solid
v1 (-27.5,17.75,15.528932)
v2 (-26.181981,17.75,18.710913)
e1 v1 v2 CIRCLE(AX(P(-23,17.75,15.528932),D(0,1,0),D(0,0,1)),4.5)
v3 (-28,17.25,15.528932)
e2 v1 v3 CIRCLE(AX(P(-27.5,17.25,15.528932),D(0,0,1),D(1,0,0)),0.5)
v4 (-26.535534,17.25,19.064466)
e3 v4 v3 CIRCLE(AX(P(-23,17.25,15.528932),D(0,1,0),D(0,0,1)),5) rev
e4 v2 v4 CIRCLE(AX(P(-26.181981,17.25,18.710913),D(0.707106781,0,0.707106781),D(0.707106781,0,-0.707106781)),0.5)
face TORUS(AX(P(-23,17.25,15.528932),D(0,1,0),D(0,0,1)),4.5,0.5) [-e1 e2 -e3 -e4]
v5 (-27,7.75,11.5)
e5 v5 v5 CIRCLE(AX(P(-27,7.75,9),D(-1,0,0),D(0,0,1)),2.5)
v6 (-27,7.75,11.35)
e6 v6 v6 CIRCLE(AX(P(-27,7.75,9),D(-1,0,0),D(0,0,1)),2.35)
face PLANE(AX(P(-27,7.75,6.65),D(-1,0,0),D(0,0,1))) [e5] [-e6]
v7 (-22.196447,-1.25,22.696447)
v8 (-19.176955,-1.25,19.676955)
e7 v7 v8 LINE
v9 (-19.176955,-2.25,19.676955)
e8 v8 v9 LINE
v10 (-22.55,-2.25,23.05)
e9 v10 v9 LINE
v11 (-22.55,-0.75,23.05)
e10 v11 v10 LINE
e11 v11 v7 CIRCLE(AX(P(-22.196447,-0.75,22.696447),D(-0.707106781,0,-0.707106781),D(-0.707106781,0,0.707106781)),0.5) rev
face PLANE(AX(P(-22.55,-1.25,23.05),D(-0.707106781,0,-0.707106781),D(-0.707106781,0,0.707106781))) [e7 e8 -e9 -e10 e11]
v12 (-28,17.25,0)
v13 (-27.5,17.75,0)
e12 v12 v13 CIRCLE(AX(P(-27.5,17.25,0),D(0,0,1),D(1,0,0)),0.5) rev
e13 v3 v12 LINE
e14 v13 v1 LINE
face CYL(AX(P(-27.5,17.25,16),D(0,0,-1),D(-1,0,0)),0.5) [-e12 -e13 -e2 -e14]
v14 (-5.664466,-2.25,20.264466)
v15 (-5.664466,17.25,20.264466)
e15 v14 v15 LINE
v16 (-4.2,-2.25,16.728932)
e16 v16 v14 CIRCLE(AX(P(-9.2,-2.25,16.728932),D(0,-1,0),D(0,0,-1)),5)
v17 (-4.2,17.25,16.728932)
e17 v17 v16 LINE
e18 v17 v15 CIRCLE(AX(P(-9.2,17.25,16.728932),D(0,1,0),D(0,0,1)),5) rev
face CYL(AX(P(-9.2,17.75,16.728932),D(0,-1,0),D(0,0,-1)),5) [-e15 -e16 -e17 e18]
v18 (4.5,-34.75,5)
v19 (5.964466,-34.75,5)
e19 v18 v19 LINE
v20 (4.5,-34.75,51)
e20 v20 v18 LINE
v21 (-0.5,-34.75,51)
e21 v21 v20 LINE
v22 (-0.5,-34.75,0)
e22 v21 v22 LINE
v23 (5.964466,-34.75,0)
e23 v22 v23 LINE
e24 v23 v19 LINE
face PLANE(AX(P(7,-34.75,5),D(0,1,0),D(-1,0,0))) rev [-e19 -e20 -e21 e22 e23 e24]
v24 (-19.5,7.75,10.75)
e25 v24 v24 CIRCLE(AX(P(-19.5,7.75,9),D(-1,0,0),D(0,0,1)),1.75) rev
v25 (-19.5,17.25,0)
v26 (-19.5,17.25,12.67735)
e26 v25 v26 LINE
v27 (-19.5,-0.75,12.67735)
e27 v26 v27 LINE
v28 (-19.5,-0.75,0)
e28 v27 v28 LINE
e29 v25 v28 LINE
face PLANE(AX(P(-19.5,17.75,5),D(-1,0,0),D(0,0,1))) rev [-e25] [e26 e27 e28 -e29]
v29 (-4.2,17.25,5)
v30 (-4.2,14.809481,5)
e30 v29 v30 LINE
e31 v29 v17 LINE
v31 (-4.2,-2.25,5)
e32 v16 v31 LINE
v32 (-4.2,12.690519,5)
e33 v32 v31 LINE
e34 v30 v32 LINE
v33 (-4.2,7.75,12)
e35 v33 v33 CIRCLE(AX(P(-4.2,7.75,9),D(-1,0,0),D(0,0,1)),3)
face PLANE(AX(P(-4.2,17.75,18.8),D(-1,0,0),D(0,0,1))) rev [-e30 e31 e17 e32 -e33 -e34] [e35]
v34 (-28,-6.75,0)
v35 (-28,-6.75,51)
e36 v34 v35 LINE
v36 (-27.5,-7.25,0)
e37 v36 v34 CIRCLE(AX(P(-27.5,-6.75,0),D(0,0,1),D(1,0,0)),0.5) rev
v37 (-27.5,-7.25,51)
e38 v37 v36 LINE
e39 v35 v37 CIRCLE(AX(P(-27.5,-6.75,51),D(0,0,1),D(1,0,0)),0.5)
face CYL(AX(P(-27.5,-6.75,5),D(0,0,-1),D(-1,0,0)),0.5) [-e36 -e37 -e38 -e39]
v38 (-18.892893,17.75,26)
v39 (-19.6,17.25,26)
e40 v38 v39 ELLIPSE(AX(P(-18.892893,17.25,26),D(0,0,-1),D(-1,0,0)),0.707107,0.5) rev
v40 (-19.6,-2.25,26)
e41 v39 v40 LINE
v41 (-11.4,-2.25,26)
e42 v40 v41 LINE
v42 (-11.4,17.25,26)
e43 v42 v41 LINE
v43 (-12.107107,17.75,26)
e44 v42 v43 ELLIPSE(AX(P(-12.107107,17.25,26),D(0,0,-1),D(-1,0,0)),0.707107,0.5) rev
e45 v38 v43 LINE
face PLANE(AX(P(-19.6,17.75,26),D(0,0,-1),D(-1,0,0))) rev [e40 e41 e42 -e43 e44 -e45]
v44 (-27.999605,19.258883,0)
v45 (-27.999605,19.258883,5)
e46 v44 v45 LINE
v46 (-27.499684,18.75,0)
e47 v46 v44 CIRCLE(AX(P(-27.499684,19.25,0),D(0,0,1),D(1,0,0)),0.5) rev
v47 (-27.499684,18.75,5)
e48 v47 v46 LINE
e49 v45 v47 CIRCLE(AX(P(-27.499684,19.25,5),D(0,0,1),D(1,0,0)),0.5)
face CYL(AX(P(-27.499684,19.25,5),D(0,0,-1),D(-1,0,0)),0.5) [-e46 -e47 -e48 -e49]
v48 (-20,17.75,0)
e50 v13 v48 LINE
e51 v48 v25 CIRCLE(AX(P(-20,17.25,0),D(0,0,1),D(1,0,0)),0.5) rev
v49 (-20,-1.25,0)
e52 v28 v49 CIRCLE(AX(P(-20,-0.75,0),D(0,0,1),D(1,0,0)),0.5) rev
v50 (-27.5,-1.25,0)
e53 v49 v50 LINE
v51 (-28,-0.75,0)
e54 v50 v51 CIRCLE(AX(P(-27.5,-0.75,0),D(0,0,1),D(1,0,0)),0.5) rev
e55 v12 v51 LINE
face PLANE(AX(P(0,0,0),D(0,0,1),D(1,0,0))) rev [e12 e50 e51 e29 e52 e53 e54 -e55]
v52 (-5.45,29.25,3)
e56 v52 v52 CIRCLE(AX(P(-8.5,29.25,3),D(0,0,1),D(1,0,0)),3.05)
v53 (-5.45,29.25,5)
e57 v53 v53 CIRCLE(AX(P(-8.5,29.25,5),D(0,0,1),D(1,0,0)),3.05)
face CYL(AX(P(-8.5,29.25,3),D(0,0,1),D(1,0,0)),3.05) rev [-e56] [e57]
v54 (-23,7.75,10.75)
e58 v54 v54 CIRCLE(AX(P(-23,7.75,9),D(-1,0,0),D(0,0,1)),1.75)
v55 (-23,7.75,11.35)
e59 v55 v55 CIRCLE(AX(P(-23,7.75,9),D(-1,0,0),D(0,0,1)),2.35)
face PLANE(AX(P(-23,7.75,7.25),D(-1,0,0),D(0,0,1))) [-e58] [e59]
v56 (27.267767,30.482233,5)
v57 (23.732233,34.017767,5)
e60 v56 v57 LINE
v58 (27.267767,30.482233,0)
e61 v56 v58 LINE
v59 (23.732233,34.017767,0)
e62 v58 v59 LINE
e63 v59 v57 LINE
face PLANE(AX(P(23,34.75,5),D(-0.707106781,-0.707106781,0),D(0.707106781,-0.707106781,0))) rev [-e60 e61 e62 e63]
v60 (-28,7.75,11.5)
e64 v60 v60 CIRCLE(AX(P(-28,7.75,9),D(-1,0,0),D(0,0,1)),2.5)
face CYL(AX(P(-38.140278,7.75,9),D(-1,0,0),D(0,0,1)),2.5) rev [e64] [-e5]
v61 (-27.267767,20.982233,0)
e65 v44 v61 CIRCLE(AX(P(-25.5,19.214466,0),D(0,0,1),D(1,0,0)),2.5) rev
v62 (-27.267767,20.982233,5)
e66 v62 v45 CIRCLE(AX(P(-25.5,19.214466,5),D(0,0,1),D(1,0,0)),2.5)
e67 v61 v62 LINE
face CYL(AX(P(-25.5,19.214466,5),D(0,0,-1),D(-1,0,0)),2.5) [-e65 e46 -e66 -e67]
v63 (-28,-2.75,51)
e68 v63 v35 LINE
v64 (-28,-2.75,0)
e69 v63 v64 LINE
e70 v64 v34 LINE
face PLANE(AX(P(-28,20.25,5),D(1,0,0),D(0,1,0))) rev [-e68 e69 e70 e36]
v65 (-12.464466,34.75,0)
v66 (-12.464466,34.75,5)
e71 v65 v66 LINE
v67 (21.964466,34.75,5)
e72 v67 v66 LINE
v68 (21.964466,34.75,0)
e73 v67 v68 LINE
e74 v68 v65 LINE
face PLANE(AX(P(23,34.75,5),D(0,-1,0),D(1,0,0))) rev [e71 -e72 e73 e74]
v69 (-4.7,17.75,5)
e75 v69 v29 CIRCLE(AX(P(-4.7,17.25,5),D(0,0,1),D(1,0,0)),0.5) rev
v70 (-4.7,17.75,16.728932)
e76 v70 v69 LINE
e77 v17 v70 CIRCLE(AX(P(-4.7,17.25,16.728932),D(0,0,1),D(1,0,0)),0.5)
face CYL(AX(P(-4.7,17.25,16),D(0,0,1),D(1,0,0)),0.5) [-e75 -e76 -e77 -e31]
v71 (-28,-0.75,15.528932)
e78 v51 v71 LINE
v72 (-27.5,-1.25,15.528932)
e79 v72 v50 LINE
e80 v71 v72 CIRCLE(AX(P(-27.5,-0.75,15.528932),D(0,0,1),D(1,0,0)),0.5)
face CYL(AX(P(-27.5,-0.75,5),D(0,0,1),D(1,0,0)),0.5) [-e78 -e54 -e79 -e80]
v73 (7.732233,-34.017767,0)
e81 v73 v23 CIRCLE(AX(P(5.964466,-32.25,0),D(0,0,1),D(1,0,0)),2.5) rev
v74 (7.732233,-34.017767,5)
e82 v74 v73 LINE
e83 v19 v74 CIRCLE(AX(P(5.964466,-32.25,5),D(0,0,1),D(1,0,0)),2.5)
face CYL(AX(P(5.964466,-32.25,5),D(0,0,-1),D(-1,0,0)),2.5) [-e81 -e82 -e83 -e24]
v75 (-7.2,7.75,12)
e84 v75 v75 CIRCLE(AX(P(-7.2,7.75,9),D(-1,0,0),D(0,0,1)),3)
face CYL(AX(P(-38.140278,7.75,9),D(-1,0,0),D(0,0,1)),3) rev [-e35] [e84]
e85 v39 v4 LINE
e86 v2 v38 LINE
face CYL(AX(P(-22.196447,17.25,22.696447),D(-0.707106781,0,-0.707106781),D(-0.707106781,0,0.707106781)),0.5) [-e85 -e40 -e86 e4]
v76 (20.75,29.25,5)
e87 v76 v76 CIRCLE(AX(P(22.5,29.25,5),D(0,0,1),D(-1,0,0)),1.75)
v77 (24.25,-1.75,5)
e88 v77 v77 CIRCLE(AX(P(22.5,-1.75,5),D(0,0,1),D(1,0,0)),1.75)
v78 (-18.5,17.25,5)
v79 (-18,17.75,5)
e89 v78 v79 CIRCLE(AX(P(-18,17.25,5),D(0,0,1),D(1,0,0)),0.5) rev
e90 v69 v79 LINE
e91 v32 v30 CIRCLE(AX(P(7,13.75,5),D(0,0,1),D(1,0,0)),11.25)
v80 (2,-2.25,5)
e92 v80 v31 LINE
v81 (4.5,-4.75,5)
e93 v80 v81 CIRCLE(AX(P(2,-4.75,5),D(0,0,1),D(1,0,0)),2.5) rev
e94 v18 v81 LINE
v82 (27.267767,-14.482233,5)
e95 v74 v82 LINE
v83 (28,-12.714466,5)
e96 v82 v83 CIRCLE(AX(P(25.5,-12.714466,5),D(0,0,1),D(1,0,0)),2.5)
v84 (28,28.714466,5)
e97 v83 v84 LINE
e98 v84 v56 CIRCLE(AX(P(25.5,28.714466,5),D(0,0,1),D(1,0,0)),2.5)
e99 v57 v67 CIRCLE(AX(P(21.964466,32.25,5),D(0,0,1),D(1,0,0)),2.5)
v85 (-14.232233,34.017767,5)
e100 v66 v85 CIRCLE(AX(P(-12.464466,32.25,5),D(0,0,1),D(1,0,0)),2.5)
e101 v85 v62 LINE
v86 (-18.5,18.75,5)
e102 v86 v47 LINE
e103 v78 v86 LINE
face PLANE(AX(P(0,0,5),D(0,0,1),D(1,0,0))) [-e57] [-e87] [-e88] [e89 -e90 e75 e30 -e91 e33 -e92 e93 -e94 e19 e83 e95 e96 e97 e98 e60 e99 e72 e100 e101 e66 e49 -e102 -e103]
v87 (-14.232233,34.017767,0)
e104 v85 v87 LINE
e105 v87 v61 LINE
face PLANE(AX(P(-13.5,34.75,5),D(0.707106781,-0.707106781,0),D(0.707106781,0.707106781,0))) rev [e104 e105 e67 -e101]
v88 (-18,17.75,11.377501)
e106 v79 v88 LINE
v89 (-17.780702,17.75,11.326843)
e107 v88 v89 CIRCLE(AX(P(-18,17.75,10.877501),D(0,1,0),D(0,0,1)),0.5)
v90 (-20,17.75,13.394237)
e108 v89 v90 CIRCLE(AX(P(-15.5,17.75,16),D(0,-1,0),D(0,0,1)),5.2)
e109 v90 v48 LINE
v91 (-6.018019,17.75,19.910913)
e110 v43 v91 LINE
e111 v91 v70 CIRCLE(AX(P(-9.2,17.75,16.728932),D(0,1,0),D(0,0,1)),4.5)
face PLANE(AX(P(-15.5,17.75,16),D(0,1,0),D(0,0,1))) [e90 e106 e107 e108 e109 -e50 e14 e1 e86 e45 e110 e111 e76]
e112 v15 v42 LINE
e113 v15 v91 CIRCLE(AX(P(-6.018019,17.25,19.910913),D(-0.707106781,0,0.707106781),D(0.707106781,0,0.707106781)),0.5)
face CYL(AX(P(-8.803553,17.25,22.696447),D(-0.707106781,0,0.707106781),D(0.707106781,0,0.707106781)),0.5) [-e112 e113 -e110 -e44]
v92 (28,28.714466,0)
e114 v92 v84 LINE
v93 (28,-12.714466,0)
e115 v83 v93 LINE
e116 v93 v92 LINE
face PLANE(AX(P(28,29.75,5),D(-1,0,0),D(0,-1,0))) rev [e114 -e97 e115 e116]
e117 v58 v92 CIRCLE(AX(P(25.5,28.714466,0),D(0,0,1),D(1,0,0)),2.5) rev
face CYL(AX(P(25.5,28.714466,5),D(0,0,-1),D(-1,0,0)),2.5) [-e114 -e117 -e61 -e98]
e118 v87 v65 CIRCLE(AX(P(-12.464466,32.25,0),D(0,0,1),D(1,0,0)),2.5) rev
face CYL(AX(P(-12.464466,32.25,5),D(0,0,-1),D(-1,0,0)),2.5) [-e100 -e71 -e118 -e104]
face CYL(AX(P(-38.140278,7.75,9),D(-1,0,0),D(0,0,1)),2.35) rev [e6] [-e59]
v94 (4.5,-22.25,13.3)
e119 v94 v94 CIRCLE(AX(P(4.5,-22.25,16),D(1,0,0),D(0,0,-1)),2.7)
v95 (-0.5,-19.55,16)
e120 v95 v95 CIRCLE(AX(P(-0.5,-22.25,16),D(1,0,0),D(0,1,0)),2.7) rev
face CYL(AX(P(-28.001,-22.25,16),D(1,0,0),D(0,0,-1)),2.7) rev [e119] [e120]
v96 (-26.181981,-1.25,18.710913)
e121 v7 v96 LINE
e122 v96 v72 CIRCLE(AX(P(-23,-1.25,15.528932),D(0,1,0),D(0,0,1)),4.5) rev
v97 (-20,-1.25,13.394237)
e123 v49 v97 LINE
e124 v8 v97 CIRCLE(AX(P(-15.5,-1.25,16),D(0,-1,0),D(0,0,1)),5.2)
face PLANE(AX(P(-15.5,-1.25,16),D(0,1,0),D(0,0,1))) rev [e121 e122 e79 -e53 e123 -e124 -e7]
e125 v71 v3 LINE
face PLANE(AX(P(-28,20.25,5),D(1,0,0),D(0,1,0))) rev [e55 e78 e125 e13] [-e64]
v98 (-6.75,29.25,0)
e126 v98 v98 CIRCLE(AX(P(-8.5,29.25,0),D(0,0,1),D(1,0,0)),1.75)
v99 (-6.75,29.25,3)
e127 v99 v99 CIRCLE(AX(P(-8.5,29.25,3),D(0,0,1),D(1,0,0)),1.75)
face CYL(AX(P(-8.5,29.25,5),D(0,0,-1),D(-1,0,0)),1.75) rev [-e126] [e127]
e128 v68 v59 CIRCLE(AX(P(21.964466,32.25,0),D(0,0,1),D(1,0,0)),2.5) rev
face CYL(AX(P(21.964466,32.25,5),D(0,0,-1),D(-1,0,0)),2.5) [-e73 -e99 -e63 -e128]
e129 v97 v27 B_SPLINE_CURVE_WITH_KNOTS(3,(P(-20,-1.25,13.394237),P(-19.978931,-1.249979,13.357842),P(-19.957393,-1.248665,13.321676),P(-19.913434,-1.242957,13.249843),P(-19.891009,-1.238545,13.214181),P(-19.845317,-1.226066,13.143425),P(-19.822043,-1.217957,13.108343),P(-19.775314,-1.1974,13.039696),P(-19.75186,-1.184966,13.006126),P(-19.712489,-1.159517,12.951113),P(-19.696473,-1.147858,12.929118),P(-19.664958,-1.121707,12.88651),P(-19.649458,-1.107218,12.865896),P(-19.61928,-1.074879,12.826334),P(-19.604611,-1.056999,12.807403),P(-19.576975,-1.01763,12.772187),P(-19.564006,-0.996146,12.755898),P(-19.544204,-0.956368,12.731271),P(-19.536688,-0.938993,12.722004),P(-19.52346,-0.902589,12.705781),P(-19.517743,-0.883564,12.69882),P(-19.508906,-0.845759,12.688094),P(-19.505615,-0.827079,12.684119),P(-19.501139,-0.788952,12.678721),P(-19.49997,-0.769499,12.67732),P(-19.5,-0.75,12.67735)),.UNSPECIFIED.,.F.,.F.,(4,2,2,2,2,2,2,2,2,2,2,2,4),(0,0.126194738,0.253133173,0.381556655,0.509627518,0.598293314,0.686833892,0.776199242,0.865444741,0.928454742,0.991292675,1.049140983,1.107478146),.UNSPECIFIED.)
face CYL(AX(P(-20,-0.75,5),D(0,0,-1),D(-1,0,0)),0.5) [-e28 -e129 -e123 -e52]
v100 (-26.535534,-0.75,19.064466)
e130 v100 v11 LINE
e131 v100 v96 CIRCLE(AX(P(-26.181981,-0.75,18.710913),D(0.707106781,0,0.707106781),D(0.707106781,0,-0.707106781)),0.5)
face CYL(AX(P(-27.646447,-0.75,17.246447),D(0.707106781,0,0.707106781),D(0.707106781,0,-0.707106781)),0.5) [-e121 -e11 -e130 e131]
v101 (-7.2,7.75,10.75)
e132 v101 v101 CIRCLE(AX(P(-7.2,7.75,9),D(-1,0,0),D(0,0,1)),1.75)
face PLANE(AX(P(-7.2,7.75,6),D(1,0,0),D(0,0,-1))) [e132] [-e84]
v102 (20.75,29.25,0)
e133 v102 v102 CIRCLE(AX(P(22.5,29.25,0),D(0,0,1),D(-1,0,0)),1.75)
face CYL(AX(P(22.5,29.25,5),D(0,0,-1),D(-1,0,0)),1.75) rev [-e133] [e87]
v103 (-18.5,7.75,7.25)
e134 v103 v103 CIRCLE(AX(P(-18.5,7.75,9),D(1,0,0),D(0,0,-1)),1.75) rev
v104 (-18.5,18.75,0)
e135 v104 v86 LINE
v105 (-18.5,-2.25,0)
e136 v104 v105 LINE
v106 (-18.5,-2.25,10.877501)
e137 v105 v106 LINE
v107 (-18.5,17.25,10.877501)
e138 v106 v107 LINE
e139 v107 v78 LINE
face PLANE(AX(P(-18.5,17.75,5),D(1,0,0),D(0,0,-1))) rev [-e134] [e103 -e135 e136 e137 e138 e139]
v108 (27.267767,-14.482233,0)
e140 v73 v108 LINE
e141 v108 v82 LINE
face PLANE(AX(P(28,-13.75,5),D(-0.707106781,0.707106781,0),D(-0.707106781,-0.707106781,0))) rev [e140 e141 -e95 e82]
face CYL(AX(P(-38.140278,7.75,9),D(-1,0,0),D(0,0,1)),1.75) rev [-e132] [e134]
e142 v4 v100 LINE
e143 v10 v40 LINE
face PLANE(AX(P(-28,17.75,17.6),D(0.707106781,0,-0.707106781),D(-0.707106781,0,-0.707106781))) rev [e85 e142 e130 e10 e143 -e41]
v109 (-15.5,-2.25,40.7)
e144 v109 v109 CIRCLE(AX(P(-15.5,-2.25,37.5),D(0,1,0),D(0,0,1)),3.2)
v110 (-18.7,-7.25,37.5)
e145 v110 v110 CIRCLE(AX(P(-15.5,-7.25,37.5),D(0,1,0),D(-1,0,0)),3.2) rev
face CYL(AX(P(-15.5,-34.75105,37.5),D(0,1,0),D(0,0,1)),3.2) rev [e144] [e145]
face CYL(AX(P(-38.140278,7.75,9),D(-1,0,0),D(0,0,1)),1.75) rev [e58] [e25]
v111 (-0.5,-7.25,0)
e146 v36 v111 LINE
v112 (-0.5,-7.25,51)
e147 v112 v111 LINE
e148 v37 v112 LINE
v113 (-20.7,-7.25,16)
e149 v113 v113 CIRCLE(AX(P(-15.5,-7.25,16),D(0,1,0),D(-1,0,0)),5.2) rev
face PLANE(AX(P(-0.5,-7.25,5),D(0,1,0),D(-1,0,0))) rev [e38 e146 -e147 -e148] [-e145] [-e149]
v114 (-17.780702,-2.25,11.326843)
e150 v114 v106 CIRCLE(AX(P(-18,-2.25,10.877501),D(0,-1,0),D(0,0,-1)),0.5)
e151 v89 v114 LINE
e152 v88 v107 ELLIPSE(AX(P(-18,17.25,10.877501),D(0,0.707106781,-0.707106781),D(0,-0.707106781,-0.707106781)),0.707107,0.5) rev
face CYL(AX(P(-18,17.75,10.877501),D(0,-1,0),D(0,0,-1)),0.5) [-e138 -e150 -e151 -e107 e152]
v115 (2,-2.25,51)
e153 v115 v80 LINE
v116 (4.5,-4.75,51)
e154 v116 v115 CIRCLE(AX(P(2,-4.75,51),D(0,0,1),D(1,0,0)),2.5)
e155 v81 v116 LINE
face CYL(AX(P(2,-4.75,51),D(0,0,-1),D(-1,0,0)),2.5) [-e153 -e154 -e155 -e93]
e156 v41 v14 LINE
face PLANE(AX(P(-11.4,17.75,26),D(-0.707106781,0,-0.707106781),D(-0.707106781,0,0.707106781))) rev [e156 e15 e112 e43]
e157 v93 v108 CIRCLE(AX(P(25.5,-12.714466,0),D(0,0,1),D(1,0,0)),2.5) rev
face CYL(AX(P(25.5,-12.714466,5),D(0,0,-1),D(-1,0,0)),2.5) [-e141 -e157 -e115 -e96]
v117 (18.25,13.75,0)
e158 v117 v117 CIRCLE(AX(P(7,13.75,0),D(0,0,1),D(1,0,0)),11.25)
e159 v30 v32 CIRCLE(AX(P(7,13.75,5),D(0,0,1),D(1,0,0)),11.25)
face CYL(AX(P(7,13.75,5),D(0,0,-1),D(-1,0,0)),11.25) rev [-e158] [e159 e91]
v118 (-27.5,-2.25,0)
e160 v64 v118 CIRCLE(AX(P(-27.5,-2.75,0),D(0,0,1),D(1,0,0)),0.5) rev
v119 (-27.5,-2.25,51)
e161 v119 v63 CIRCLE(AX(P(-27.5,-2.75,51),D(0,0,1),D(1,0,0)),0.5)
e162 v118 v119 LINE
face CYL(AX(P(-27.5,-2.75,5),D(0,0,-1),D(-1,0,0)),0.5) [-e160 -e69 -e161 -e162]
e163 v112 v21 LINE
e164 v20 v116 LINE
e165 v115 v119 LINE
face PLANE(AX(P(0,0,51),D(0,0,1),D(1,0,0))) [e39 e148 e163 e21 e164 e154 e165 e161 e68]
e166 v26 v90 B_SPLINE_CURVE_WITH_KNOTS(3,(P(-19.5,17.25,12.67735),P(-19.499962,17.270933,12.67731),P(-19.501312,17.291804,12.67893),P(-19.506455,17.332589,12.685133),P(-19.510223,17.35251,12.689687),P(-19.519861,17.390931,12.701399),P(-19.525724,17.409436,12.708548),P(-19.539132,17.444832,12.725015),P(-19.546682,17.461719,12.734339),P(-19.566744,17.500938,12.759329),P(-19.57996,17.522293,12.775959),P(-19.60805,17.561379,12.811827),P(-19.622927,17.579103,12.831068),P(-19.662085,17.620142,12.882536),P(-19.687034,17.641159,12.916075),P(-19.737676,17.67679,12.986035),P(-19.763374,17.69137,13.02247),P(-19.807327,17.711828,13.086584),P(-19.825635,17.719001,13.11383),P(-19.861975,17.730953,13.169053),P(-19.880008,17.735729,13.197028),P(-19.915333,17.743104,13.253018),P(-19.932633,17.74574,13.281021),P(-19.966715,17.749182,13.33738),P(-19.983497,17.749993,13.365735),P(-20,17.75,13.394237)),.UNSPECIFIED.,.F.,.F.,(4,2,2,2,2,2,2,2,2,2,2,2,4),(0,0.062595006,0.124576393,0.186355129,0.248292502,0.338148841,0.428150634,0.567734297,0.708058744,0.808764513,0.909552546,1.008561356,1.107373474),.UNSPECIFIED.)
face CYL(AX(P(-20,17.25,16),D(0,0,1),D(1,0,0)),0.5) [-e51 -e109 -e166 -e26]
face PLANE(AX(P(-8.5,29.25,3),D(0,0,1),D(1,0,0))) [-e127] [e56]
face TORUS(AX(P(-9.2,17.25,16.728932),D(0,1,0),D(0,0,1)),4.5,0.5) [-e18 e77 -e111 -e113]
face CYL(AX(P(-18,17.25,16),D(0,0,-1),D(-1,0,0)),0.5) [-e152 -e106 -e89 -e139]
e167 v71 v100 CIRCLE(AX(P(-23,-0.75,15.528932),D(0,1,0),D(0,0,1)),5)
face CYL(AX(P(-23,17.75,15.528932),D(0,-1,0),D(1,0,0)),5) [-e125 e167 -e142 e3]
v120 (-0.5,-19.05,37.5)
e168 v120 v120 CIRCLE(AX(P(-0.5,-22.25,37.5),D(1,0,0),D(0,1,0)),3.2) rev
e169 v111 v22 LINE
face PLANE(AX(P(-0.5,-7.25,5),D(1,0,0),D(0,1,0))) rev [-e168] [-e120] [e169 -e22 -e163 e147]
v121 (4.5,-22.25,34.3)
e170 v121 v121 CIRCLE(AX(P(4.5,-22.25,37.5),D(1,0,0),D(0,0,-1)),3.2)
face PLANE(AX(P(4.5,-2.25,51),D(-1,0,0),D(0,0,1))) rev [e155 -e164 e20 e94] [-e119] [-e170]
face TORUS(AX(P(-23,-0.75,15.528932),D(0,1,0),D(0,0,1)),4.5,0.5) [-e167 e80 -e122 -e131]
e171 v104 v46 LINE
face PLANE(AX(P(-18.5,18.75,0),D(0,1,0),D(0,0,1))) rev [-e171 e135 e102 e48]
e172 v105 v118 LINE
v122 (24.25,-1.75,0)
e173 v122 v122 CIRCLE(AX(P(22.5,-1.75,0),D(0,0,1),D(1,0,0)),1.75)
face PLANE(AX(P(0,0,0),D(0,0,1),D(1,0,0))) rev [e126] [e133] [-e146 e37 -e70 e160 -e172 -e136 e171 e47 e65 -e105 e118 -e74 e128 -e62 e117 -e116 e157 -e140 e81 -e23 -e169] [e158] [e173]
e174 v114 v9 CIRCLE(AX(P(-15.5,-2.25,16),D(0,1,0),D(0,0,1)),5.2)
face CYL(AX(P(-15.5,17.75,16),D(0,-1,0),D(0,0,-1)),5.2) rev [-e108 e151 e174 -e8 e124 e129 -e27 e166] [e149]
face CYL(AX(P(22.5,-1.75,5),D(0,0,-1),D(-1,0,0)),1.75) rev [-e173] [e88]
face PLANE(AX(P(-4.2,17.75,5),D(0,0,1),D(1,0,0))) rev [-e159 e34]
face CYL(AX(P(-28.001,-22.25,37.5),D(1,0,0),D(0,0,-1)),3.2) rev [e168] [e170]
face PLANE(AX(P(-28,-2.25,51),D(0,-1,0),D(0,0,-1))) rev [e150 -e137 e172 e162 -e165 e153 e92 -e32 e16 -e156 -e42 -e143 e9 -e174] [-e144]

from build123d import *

# Parameters (mm, degrees)
SKETCH1_R           = 11.25
SKETCH1_R_2         = 1.75
BOSS_EXTRUDE1_DEPTH = 5
BOSS_EXTRUDE2_DEPTH = 46
BOSS_EXTRUDE3_DEPTH = 20
CUT_EXTRUDE1_DEPTH  = 1
CUT_EXTRUDE2_DEPTH  = 65.090268372
CUT_EXTRUDE3_REACH  = 71.748
SKETCH6_R           = 2.7
SKETCH6_R_2         = 3.2
CUT_EXTRUDE4_REACH  = 70.949
SKETCH7_R           = 5.2
SKETCH7_R_2         = 3.2
SKETCH8_R           = 3.05
CUT_EXTRUDE5_DEPTH  = 2
FILLET1_R           = 2.5
FILLET2_R           = 5
FILLET3_R           = 0.5


with BuildPart() as part:
    # Sketch1 → Boss-Extrude1 (new body)
    with BuildSketch(Plane.XY):
        Polygon((-13.5, 34.75), (-28, 20.25), (-28, -7.25), (-0.5, -7.25), (-0.5, -34.75), (7, -34.75), (28, -13.75), (28, 29.75), (23, 34.75), align=None)
        with Locations((7, 13.75)):
            Circle(SKETCH1_R, mode=Mode.SUBTRACT)
        with Locations((-8.5, 29.25)):
            Circle(SKETCH1_R_2, mode=Mode.SUBTRACT)
        with Locations(Location((22.5, 29.25, 0), (0, 0, 180))):
            Circle(SKETCH1_R_2, mode=Mode.SUBTRACT)
        with Locations((22.5, -1.75)):
            Circle(SKETCH1_R_2, mode=Mode.SUBTRACT)
    extrude(amount=BOSS_EXTRUDE1_DEPTH)

    # Sketch2 → Boss-Extrude2 (add)
    with BuildSketch(Plane.XY.offset(5)):
        Polygon((-28, -7.25), (-0.5, -7.25), (-0.5, -34.75), (4.5, -34.75), (4.5, -2.25), (-28, -2.25), align=None)
    extrude(amount=BOSS_EXTRUDE2_DEPTH)

    # Sketch3 → Boss-Extrude3 (add)
    with BuildSketch(Plane(origin=(0, -2.25, 0), x_dir=(1, 0, 0), z_dir=(0, 1, 0))):
        with BuildLine():
            Line((-28, -5), (-28, -17.6))
            Line((-28, -17.6), (-19.6, -26))
            Line((-19.6, -26), (-11.4, -26))
            Line((-11.4, -26), (-4.2, -18.8))
            Line((-4.2, -18.8), (-4.2, -5))
            Line((-4.2, -5), (-18.5, -5))
            Line((-18.5, -5), (-18.5, -11.752647884))
            ThreePointArc((-18.5, -11.752647884), (-11.96959369, -19.81788309), (-19.5, -12.677350455))
            Line((-19.5, -12.677350455), (-19.5, -5))
            Line((-19.5, -5), (-28, -5))
        make_face()
    extrude(amount=BOSS_EXTRUDE3_DEPTH)

    # Sketch4 → Cut-Extrude1 (cut)
    with BuildSketch(Plane(origin=(0, -2.25, 0), x_dir=(1, 0, 0), z_dir=(0, 1, 0))):
        with BuildLine():
            Line((-28, -17.6), (-28, 0))
            Line((-28, 0), (-18.5, 0))
            Line((-18.5, 0), (-18.5, -11.752647884))
            ThreePointArc((-18.5, -11.752647884), (-20.681128714, -15.55738815), (-19.176955262, -19.676955262))
            Line((-19.176955262, -19.676955262), (-22.55, -23.05))
            Line((-22.55, -23.05), (-28, -17.6))
        make_face()
    extrude(amount=CUT_EXTRUDE1_DEPTH, mode=Mode.SUBTRACT)

    # Sketch5 → Cut-Extrude2 (cut, through all)
    with BuildSketch(Plane.XY.offset(5)):
        Polygon((-19.5, 17.75), (-28, 17.75), (-28, 18.75), (-18.5, 18.75), (-18.5, -1.25), (-19.5, -1.25), align=None)
    extrude(amount=-CUT_EXTRUDE2_DEPTH, mode=Mode.SUBTRACT)

    # Sketch6 → Cut-Extrude3 (cut, up to next)
    with BuildSketch(Plane(origin=(4.5, 0, 0), x_dir=(0, 0, -1), z_dir=(1, 0, 0)), mode=Mode.PRIVATE) as cut_extrude3_sk1:
        with Locations((-16, -22.25)):
            Circle(SKETCH6_R)
    cut_extrude3_tool1 = extrude(cut_extrude3_sk1.sketch, amount=-CUT_EXTRUDE3_REACH, mode=Mode.PRIVATE) & part.part
    # Sketch6 → Cut-Extrude3 (cut, up to next)
    with BuildSketch(Plane(origin=(4.5, 0, 0), x_dir=(0, 0, -1), z_dir=(1, 0, 0)), mode=Mode.PRIVATE) as cut_extrude3_sk2:
        with Locations((-37.5, -22.25)):
            Circle(SKETCH6_R_2)
    cut_extrude3_tool2 = extrude(cut_extrude3_sk2.sketch, amount=-CUT_EXTRUDE3_REACH, mode=Mode.PRIVATE) & part.part
    add(cut_extrude3_tool1.solids().sort_by_distance((4.5, -22.25, 16))[0], mode=Mode.SUBTRACT)
    add(cut_extrude3_tool2.solids().sort_by_distance((4.5, -22.25, 37.5))[0], mode=Mode.SUBTRACT)

    # Sketch7 → Cut-Extrude4 (cut, up to next)
    with BuildSketch(Plane(origin=(0, -2.25, 0), x_dir=(1, 0, 0), z_dir=(0, 1, 0)), mode=Mode.PRIVATE) as cut_extrude4_sk1:
        with Locations(Location((-15.5, -16, 0), (0, 0, 125.234417985))):
            Circle(SKETCH7_R)
    cut_extrude4_tool1 = extrude(cut_extrude4_sk1.sketch, amount=-CUT_EXTRUDE4_REACH, mode=Mode.PRIVATE) & part.part
    # Sketch7 → Cut-Extrude4 (cut, up to next)
    with BuildSketch(Plane(origin=(0, -2.25, 0), x_dir=(1, 0, 0), z_dir=(0, 1, 0)), mode=Mode.PRIVATE) as cut_extrude4_sk2:
        with Locations(Location((-15.5, -37.5, 0), (0, 0, 270))):
            Circle(SKETCH7_R_2)
    cut_extrude4_tool2 = extrude(cut_extrude4_sk2.sketch, amount=-CUT_EXTRUDE4_REACH, mode=Mode.PRIVATE) & part.part
    add(cut_extrude4_tool1.solids().sort_by_distance((-15.5, -2.25, 16))[0], mode=Mode.SUBTRACT)
    add(cut_extrude4_tool2.solids().sort_by_distance((-15.5, -2.25, 37.5))[0], mode=Mode.SUBTRACT)

    # Sketch8 → Cut-Extrude5 (cut)
    with BuildSketch(Plane.XY.offset(5)):
        with Locations((-8.5, 29.25)):
            Circle(SKETCH8_R)
    extrude(amount=-CUT_EXTRUDE5_DEPTH, mode=Mode.SUBTRACT)

    # Sketch9 → Cut-Revolve1 (revolve, cut)
    with BuildSketch(Plane(origin=(0, 7.75, 0), x_dir=(1, 0, 0), z_dir=(0, 1, 0)), mode=Mode.PRIVATE) as cut_revolve1_sk:
        Polygon((-4.2, -9), (-4.2, -6), (-7.2, -6), (-7.2, -7.25), (-23, -7.25), (-23, -6.65), (-27, -6.65), (-27, -6.5), (-28, -6.5), (-28, -9), align=None)
    revolve(cut_revolve1_sk.sketch.rotate(Axis((-38.14027768, 7.75, 9), (1, 0, 0)), 180), axis=Axis((-38.14027768, 7.75, 9), (1, 0, 0)), mode=Mode.SUBTRACT)

    # Fillet1
    fillet1_edges = [part.edges().sort_by_distance(p)[0] for p in [
        (4.5, -2.25, 28),
        (-28, 20.25, 2.5),
        (7, -34.75, 2.5),
        (28, -13.75, 2.5),
        (28, 29.75, 2.5),
        (23, 34.75, 2.5),
        (-13.5, 34.75, 2.5),
    ]]
    fillet(fillet1_edges, radius=FILLET1_R)

    # Fillet2
    fillet2_edges = [part.edges().sort_by_distance(p)[0] for p in [
        (-28, 8.25, 17.6),
        (-4.2, 7.75, 18.8),
    ]]
    fillet(fillet2_edges, radius=FILLET2_R)

    # Fillet3
    # the kernel refuses this fillet: 0.5 mm, written as the material it takes off along each edge
    with BuildSketch(Plane(origin=(-28, -1.25, 15.528932188), x_dir=(1, 0, 0), z_dir=(0, 0, -1)), Plane(origin=(-28, 17.75, -1.25), x_dir=(1, 0, 0), z_dir=(0, 0, 1))) as fillet3_piece_1:
        with BuildLine():
            CenterArc((FILLET3_R, -FILLET3_R), FILLET3_R, 90, 90)
            Line((0, -FILLET3_R), (0, 0))
            Line((0, 0), (FILLET3_R, 0))
        make_face()
    extrude(amount=16.778932188, mode=Mode.SUBTRACT)
    with BuildSketch(Plane(origin=(-28, 18.75, 6.272209074), x_dir=(0.0007754462768724465, 0.9999996993414906, 0), z_dir=(0, 0, -1))) as fillet3_piece_2:
        with BuildLine():
            CenterArc((0.500387818, 0.499927816), FILLET3_R, 179.955570197, 91.018024984)
            Line((0.000387968, 0.500315539), (-0.049612017, 0.500354311))
            Line((-0.049612017, 0.500354311), (-0.049999985, 3.8772e-05))
            Line((-0.049999985, 3.8772e-05), (-3.8772e-05, -0.049999985))
            ThreePointArc((-3.8772e-05, -0.049999985), (0.464427182, -0.050360153), (0.509733211, -0.049992782))
            Line((0.509733211, -0.049992782), (0.508883629, 0))
        make_face()
    extrude(amount=7.544418147, mode=Mode.SUBTRACT)
    with BuildSketch(Plane(origin=(-28, -7.25, -1.25), x_dir=(0, 1, 0), z_dir=(0, 0, 1))) as fillet3_piece_3:
        with BuildLine():
            CenterArc((FILLET3_R, -FILLET3_R), FILLET3_R, 90, 90)
            Line((0, -FILLET3_R), (0, 0))
            Line((0, 0), (FILLET3_R, 0))
        make_face()
    extrude(amount=53.5, mode=Mode.SUBTRACT)
    with BuildSketch(Plane(origin=(-26.535533906, 17.75, 19.064466094), x_dir=(0, -1, 0), z_dir=(0.707106781186549, 0, 0.707106781186546))) as fillet3_piece_4:
        with BuildLine():
            CenterArc((FILLET3_R, FILLET3_R), FILLET3_R, 180, 90)
            Line((0, FILLET3_R), (0, 0))
            Line((0, 0), (FILLET3_R, 0))
        make_face()
    extrude(amount=11.058326112, mode=Mode.SUBTRACT)
    with BuildSketch(Plane(origin=(-22.55, -1.25, 23.05), x_dir=(0, 1, 0), z_dir=(-0.7071067811865489, 0, -0.7071067811865461))) as fillet3_piece_5:
        with BuildLine():
            CenterArc((FILLET3_R, FILLET3_R), FILLET3_R, 180, 90)
            Line((0, FILLET3_R), (0, 0))
            Line((0, 0), (FILLET3_R, 0))
        make_face()
    extrude(amount=5.636396103, mode=Mode.SUBTRACT)
    with BuildSketch(Plane(origin=(-23, -1.25, 15.528932188), x_dir=(-0.7071067811865456, 0, 0.7071067811865495), z_dir=(0.7071067811865495, 0, 0.7071067811865456))) as fillet3_piece_6:
        with BuildLine():
            CenterArc((5 - FILLET3_R, -FILLET3_R), FILLET3_R, 0, 90)
            Line((5, -FILLET3_R), (5, 0))
            Line((5, 0), (5 - FILLET3_R, 0))
        make_face()
    revolve(axis=Axis((-23, -1.25, 15.528932188), (0, -1, 0)), revolution_arc=45, mode=Mode.SUBTRACT)
    with BuildSketch(Plane(origin=(-4.2, 17.75, 16.728932188), x_dir=(0, -1, 0), z_dir=(0, 0, -1))) as fillet3_piece_7:
        with BuildLine():
            CenterArc((FILLET3_R, FILLET3_R), FILLET3_R, 180, 90)
            Line((0, FILLET3_R), (0, 0))
            Line((0, 0), (FILLET3_R, 0))
        make_face()
    extrude(amount=11.728932188, mode=Mode.SUBTRACT)
    with BuildSketch(Plane(origin=(-9.2, 17.75, 16.728932188), x_dir=(1, 0, 0), z_dir=(0, 0, -1))) as fillet3_piece_8:
        with BuildLine():
            CenterArc((5 - FILLET3_R, FILLET3_R), FILLET3_R, 270, 90)
            Line((5 - FILLET3_R, 0), (5, 0))
            Line((5, 0), (5, FILLET3_R))
        make_face()
    revolve(axis=Axis((-9.2, 17.75, 16.728932188), (0, -1, 0)), revolution_arc=45, mode=Mode.SUBTRACT)
    with BuildSketch(Plane(origin=(-23, 17.75, 15.528932188), x_dir=(-0.7071067811865456, 0, 0.7071067811865495), z_dir=(0.7071067811865495, 0, 0.7071067811865456))) as fillet3_piece_9:
        with BuildLine():
            CenterArc((5 - FILLET3_R, FILLET3_R), FILLET3_R, 270, 90)
            Line((5, FILLET3_R), (5, 0))
            Line((5, 0), (5 - FILLET3_R, 0))
        make_face()
    revolve(axis=Axis((-23, 17.75, 15.528932188), (0, -1, 0)), revolution_arc=45, mode=Mode.SUBTRACT)
    with BuildSketch(Plane(origin=(-28, -2.25, 52.25), x_dir=(1, 0, 0), z_dir=(0, 0, -1))) as fillet3_piece_10:
        with BuildLine():
            CenterArc((FILLET3_R, FILLET3_R), FILLET3_R, 180, 90)
            Line((0, FILLET3_R), (0, 0))
            Line((0, 0), (FILLET3_R, 0))
        make_face()
    extrude(amount=53.5, mode=Mode.SUBTRACT)
    with BuildSketch(Plane(origin=(-18.5, -2.25, 11.752647884), x_dir=(0, 0, -1), z_dir=(0, 1, 0))) as fillet3_piece_11:
        with BuildLine():
            CenterArc((0.875147274, -0.5), FILLET3_R, 90, 116.014366)
            ThreePointArc((0.425805222, -0.719298246), (0.22737913, -0.351079413), (0, 0))
            Line((0, 0), (0.875147274, 0))
        make_face()
    extrude(amount=22.187868184, mode=Mode.SUBTRACT)
    with BuildSketch(Plane(origin=(-12.283883476, 17.75, 26.883883476), x_dir=(0, -1, 0), z_dir=(0.7071067811865485, 0, -0.7071067811865467))) as fillet3_piece_12:
        with BuildLine():
            CenterArc((FILLET3_R, FILLET3_R), FILLET3_R, 180, 90)
            Line((0, FILLET3_R), (0, 0))
            Line((0, 0), (FILLET3_R, 0))
        make_face()
    extrude(amount=9.361269837, mode=Mode.SUBTRACT)
    with BuildSketch(Plane(origin=(-18.5, 17.75, 5), x_dir=(0, -1, 0), z_dir=(0, 0, 1))) as fillet3_piece_13:
        with BuildLine():
            CenterArc((FILLET3_R, FILLET3_R), FILLET3_R, 180, 90)
            Line((0, FILLET3_R), (0, 0))
            Line((0, 0), (FILLET3_R, 0))
        make_face()
    extrude(amount=8.002647884, mode=Mode.SUBTRACT)
    with BuildSketch(Plane(origin=(-19.5, 17.75, 13.927350455), x_dir=(-1, 0, 0), z_dir=(0, 0, -1))) as fillet3_piece_14:
        with BuildLine():
            CenterArc((FILLET3_R, -FILLET3_R), FILLET3_R, 90, 90)
            Line((0, -FILLET3_R), (0, 0))
            Line((0, 0), (FILLET3_R, 0))
        make_face()
    extrude(amount=15.177350455, mode=Mode.SUBTRACT)
    with BuildSketch(Plane(origin=(-19.5, -1.25, 13.927350455), x_dir=(-1, 0, 0), z_dir=(0, 0, -1))) as fillet3_piece_15:
        with BuildLine():
            CenterArc((FILLET3_R, FILLET3_R), FILLET3_R, 180, 90)
            Line((0, FILLET3_R), (0, 0))
            Line((0, 0), (FILLET3_R, 0))
        make_face()
    extrude(amount=15.177350455, mode=Mode.SUBTRACT)


solid = part.part
